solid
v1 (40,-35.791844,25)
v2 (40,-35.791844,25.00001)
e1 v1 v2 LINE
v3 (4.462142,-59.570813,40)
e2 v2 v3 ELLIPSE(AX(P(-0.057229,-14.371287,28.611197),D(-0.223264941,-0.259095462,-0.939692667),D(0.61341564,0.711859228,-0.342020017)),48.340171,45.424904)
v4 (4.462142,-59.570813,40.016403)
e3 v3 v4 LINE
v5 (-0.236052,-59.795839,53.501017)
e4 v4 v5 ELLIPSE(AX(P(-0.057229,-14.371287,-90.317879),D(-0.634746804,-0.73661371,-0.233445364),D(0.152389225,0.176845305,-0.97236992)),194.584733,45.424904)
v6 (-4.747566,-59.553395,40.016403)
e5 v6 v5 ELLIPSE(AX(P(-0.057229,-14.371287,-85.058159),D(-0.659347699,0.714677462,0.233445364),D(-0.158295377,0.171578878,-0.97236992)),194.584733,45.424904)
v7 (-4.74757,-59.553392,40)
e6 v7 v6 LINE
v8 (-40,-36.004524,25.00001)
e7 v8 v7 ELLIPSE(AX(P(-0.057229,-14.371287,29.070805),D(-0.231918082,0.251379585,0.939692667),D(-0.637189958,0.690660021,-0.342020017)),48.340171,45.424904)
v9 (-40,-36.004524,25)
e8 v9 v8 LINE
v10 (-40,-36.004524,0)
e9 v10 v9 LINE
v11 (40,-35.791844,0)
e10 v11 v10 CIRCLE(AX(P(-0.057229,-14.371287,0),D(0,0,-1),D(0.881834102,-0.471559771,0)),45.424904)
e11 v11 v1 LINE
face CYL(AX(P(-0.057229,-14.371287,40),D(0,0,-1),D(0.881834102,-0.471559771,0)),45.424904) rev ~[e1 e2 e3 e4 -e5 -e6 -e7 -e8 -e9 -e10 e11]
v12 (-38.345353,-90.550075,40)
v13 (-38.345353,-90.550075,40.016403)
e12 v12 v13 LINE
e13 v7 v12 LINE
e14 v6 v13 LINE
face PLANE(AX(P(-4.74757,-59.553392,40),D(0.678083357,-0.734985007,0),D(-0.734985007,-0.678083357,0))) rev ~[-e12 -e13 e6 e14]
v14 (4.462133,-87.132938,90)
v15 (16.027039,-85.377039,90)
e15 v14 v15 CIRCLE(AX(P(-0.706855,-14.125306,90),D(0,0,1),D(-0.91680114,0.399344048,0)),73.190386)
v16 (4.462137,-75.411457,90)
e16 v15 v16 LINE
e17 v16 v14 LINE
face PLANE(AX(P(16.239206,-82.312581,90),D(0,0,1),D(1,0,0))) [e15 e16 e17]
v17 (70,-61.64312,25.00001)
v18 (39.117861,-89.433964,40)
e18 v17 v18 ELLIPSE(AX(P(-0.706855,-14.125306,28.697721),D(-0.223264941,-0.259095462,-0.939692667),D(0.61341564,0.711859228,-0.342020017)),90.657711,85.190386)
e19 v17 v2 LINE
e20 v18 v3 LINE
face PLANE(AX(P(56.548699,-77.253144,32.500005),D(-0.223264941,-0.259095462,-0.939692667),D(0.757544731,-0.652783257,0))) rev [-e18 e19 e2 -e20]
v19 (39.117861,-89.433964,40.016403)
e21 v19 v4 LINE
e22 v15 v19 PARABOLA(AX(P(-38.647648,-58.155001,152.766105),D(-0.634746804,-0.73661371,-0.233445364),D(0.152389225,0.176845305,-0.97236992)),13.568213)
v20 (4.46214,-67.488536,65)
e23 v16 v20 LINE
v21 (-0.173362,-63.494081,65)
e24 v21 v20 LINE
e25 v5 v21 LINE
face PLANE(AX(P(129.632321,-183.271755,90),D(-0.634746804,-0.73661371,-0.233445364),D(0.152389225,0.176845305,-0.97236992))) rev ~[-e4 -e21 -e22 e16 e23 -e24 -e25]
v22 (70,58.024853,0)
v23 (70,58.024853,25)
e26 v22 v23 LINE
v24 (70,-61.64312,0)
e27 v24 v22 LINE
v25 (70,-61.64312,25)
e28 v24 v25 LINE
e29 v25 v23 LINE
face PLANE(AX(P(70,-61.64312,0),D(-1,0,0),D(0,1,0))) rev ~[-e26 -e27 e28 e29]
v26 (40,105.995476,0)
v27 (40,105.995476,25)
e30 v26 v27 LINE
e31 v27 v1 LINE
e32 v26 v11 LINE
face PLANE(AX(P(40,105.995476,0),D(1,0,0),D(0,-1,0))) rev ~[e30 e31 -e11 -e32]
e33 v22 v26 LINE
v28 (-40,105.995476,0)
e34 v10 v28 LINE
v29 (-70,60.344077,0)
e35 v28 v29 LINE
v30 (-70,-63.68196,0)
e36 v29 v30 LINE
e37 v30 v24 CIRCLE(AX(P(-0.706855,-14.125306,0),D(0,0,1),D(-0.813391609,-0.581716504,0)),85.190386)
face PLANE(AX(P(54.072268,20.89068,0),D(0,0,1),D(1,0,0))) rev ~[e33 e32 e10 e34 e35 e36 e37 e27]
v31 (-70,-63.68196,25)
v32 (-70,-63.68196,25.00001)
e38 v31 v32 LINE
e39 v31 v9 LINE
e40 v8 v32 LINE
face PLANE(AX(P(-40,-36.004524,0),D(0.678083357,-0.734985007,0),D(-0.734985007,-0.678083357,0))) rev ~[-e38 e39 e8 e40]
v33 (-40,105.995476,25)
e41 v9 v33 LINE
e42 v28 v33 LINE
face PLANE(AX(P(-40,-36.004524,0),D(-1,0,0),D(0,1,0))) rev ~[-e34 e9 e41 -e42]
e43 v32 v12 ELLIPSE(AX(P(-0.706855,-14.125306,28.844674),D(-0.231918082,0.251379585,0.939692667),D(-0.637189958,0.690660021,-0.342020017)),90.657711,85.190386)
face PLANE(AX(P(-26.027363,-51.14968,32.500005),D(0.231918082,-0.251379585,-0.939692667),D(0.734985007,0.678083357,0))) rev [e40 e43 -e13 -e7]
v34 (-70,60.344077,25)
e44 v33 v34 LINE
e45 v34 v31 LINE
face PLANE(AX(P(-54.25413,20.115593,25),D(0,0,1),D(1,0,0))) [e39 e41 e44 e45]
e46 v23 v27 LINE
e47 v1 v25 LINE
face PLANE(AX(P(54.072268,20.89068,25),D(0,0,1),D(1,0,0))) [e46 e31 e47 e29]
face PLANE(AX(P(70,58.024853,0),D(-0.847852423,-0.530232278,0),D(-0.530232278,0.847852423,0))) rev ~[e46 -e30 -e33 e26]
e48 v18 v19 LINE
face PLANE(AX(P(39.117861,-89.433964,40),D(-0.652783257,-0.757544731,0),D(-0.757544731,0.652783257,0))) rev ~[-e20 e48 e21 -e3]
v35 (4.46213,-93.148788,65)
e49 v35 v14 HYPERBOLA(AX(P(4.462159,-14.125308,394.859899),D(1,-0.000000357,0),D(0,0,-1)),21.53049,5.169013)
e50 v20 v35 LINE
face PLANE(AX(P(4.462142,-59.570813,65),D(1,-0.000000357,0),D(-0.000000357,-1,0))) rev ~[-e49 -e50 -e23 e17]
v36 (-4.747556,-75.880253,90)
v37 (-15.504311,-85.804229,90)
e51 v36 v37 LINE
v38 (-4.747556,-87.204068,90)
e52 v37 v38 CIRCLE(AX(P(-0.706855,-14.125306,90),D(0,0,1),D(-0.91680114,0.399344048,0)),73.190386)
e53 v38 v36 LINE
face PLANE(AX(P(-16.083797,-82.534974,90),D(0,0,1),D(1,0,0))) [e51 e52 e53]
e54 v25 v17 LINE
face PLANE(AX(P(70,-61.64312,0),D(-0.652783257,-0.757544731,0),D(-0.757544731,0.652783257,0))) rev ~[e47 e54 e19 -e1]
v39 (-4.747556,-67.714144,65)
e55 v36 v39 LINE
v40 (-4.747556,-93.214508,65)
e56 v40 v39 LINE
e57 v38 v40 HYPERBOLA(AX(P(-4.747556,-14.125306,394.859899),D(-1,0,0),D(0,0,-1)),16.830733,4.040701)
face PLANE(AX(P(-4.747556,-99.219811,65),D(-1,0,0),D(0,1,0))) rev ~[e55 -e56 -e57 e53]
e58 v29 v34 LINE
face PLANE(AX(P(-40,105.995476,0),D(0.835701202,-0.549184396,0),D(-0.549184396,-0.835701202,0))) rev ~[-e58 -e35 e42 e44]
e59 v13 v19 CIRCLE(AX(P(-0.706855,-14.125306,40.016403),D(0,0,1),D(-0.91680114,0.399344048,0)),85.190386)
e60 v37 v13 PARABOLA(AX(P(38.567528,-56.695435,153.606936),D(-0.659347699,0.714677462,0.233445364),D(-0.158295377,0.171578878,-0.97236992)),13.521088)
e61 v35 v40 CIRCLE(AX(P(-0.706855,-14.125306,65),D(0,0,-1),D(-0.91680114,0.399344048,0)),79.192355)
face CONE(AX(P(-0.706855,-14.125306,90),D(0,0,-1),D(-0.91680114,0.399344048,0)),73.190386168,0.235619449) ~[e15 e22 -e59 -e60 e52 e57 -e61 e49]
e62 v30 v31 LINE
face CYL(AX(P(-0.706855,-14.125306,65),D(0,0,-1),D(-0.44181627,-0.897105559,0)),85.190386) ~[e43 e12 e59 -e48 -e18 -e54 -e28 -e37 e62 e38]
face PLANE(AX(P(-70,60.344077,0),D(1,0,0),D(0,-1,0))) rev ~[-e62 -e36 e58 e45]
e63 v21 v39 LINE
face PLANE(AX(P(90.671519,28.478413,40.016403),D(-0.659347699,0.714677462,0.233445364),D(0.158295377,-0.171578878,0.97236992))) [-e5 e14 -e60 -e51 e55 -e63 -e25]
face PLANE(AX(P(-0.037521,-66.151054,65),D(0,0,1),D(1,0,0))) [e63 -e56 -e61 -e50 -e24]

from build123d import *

# Parameters (mm, degrees)
F1_DEPTH    = 40
F2_DEPTH    = 25
F3_DEPTH    = 25
F4_SIZE2    = 41.212151
F4_SIZE     = 14.99999
F4_2_SIZE2  = 41.212151
F4_2_SIZE   = 14.99999
F5_DEPTH    = 25
F8_DEPTH    = 25
F9_T1_DEPTH = 305.3611948779
F9_T3_DEPTH = 305.3964050976
F9_T6_ANGLE = 198.1358920289
F9_T8_ANGLE = 199.0272584804


# Not quite as in the source:
# - a fillet or chamfer that OpenCascade refuses, or shapes differently, is made with other operations: its cross-section is extruded or revolved along the edge and cut away or added
# - a fillet or chamfer is up to 0.001 mm smaller than in the source, because OpenCascade refuses the exact size
# - ends of sketch curves that miss each other by under 0.0002 mm in the source are joined
# - a feature of the source that left no trace in its solid (it failed there, or was rolled back) is left out


with BuildPart() as f1:
    # F0 (on Top) → F1 (new body)
    with BuildSketch(Plane.XY):
        with BuildLine():
            Line((-40, -36.0045238119), (-70, -63.6819600925))
            ThreePointArc((-70, -63.6819600925), (0.5336536193, -99.3066602871), (70, -61.643119862))
            Line((70, -61.643119862), (40, -35.7918441296))
            ThreePointArc((40, -35.7918441296), (0.0635323292, -59.7960301521), (-40, -36.0045238119))
        make_face()
    extrude(amount=F1_DEPTH)

    # F0 (on Top) → F2 (join)
    with BuildSketch(Plane.XY):
        Polygon((-40, 105.9954761881), (-70, 60.3440771007), (-70, -63.6819600925), (-40, -36.0045238119), align=None)
    extrude(amount=F2_DEPTH)

    # F0 (on Top) → F3 (join)
    with BuildSketch(Plane.XY):
        Polygon((40, -35.7918441296), (70, -61.643119862), (70, 58.0248532689), (40, 105.9954761881), align=None)
    extrude(amount=F3_DEPTH)

    # F4 (size 15 and 41.2121612918 in the source; OpenCascade refuses exactly that, so slightly less here)
    f4_edges = [f1.edges().sort_by_distance(p)[0] for p in [
        (55, -48.717482, 40),
    ]]
    f4_side = f1.faces().sort_by_distance((55, -48.717482, 32.5))[0]
    chamfer(f4_edges, length=F4_SIZE, length2=F4_SIZE2, reference=f4_side)

    # F4#2 (size 15 and 41.2121612918 in the source; OpenCascade refuses exactly that, so slightly less here)
    f4_2_edges = [f1.edges().sort_by_distance(p)[0] for p in [
        (-55, -49.843242, 40),
    ]]
    f4_2_side = f1.faces().sort_by_distance((-55, -49.843242, 32.5))[0]
    chamfer(f4_2_edges, length=F4_2_SIZE, length2=F4_2_SIZE2, reference=f4_2_side)

    # F5 (add): a face of the model
    f5_faces = [f1.faces().sort_by_distance(p)[0] for p in [
        (0.2353529627, -82.8231732058, 40),
    ]]
    extrude(f5_faces, amount=F5_DEPTH)

    # F6 (on face) → F8 (join)
    with BuildSketch(Plane.XY.offset(65)):
        with BuildLine():
            Line((-4.7475561509, -99.219810589), (-4.7475561509, -59.5533930445))
            Line((-4.7475561509, -59.5533930445), (-38.3453534122, -90.5500754708))
            ThreePointArc((-38.3453534122, -90.5500754708), (-21.992530831, -96.6136201427), (-4.7475561509, -99.219810589))
        make_face()
        with BuildLine():
            Line((39.117860909, -89.4339641513), (4.4621424554, -59.5708130363))
            Line((4.4621424554, -59.5708130363), (4.4621283286, -99.1587323277))
            ThreePointArc((4.4621283286, -99.1587323277), (22.3094657758, -96.1475649652), (39.117860909, -89.4339641513))
        make_face()
    extrude(amount=F8_DEPTH)

    # F9: chamfer of 12 x 49.9835972411 on 4 edges, made by hand

    # F9_s2 → F9_t1 (cut)
    with BuildSketch(Plane(origin=(63.1741452332, 58.2832529798, 0), x_dir=(0, 0, 1), z_dir=(-0.73498516, -0.6780831915, 0))):
        Polygon((40.0164027589, -40.5516220902), (90, -52.5516220902), (90, -40.5516220902), align=None)
    extrude(amount=F9_T1_DEPTH, mode=Mode.SUBTRACT)

    # F9_s4 → F9_t3 (cut)
    with BuildSketch(Plane(origin=(165.0227982776, -142.2016620137, 0), x_dir=(0, 0, 1), z_dir=(-0.7575447308, 0.6527832572, 0))):
        Polygon((90, -54.2147436385), (40.0164027589, -42.2147436385), (90, -42.2147436385), align=None)
    extrude(amount=F9_T3_DEPTH, mode=Mode.SUBTRACT)

    # F9_s5 → F9_t6 (revolve, cut)
    with BuildSketch(Plane(origin=(-5.284270337, -12.1314567966, 0), x_dir=(0, 0, 1), z_dir=(0.3993440485, 0.9168011404, 0))):
        Polygon((90, -68.1975743243), (40.0164027589, -80.1975743243), (90, -80.1975743243), align=None)
    revolve(axis=Axis((-0.7068547451, -14.1253064914, 90), (0, 0, 1)), revolution_arc=F9_T6_ANGLE, mode=Mode.SUBTRACT)

    # F9_s7 → F9_t8 (revolve, cut)
    with BuildSketch(Plane(origin=(1.4990811594, -13.8871820878, 0), x_dir=(0, 0, 1), z_dir=(-0.1073236217, 0.9942241398, 0))):
        Polygon((40.0164027589, -87.4091372686), (90, -75.4091372686), (90, -87.4091372686), align=None)
    revolve(axis=Axis((-0.7068547451, -14.1253064914, 90), (0, 0, 1)), revolution_arc=F9_T8_ANGLE, mode=Mode.SUBTRACT)


solid = f1.part
